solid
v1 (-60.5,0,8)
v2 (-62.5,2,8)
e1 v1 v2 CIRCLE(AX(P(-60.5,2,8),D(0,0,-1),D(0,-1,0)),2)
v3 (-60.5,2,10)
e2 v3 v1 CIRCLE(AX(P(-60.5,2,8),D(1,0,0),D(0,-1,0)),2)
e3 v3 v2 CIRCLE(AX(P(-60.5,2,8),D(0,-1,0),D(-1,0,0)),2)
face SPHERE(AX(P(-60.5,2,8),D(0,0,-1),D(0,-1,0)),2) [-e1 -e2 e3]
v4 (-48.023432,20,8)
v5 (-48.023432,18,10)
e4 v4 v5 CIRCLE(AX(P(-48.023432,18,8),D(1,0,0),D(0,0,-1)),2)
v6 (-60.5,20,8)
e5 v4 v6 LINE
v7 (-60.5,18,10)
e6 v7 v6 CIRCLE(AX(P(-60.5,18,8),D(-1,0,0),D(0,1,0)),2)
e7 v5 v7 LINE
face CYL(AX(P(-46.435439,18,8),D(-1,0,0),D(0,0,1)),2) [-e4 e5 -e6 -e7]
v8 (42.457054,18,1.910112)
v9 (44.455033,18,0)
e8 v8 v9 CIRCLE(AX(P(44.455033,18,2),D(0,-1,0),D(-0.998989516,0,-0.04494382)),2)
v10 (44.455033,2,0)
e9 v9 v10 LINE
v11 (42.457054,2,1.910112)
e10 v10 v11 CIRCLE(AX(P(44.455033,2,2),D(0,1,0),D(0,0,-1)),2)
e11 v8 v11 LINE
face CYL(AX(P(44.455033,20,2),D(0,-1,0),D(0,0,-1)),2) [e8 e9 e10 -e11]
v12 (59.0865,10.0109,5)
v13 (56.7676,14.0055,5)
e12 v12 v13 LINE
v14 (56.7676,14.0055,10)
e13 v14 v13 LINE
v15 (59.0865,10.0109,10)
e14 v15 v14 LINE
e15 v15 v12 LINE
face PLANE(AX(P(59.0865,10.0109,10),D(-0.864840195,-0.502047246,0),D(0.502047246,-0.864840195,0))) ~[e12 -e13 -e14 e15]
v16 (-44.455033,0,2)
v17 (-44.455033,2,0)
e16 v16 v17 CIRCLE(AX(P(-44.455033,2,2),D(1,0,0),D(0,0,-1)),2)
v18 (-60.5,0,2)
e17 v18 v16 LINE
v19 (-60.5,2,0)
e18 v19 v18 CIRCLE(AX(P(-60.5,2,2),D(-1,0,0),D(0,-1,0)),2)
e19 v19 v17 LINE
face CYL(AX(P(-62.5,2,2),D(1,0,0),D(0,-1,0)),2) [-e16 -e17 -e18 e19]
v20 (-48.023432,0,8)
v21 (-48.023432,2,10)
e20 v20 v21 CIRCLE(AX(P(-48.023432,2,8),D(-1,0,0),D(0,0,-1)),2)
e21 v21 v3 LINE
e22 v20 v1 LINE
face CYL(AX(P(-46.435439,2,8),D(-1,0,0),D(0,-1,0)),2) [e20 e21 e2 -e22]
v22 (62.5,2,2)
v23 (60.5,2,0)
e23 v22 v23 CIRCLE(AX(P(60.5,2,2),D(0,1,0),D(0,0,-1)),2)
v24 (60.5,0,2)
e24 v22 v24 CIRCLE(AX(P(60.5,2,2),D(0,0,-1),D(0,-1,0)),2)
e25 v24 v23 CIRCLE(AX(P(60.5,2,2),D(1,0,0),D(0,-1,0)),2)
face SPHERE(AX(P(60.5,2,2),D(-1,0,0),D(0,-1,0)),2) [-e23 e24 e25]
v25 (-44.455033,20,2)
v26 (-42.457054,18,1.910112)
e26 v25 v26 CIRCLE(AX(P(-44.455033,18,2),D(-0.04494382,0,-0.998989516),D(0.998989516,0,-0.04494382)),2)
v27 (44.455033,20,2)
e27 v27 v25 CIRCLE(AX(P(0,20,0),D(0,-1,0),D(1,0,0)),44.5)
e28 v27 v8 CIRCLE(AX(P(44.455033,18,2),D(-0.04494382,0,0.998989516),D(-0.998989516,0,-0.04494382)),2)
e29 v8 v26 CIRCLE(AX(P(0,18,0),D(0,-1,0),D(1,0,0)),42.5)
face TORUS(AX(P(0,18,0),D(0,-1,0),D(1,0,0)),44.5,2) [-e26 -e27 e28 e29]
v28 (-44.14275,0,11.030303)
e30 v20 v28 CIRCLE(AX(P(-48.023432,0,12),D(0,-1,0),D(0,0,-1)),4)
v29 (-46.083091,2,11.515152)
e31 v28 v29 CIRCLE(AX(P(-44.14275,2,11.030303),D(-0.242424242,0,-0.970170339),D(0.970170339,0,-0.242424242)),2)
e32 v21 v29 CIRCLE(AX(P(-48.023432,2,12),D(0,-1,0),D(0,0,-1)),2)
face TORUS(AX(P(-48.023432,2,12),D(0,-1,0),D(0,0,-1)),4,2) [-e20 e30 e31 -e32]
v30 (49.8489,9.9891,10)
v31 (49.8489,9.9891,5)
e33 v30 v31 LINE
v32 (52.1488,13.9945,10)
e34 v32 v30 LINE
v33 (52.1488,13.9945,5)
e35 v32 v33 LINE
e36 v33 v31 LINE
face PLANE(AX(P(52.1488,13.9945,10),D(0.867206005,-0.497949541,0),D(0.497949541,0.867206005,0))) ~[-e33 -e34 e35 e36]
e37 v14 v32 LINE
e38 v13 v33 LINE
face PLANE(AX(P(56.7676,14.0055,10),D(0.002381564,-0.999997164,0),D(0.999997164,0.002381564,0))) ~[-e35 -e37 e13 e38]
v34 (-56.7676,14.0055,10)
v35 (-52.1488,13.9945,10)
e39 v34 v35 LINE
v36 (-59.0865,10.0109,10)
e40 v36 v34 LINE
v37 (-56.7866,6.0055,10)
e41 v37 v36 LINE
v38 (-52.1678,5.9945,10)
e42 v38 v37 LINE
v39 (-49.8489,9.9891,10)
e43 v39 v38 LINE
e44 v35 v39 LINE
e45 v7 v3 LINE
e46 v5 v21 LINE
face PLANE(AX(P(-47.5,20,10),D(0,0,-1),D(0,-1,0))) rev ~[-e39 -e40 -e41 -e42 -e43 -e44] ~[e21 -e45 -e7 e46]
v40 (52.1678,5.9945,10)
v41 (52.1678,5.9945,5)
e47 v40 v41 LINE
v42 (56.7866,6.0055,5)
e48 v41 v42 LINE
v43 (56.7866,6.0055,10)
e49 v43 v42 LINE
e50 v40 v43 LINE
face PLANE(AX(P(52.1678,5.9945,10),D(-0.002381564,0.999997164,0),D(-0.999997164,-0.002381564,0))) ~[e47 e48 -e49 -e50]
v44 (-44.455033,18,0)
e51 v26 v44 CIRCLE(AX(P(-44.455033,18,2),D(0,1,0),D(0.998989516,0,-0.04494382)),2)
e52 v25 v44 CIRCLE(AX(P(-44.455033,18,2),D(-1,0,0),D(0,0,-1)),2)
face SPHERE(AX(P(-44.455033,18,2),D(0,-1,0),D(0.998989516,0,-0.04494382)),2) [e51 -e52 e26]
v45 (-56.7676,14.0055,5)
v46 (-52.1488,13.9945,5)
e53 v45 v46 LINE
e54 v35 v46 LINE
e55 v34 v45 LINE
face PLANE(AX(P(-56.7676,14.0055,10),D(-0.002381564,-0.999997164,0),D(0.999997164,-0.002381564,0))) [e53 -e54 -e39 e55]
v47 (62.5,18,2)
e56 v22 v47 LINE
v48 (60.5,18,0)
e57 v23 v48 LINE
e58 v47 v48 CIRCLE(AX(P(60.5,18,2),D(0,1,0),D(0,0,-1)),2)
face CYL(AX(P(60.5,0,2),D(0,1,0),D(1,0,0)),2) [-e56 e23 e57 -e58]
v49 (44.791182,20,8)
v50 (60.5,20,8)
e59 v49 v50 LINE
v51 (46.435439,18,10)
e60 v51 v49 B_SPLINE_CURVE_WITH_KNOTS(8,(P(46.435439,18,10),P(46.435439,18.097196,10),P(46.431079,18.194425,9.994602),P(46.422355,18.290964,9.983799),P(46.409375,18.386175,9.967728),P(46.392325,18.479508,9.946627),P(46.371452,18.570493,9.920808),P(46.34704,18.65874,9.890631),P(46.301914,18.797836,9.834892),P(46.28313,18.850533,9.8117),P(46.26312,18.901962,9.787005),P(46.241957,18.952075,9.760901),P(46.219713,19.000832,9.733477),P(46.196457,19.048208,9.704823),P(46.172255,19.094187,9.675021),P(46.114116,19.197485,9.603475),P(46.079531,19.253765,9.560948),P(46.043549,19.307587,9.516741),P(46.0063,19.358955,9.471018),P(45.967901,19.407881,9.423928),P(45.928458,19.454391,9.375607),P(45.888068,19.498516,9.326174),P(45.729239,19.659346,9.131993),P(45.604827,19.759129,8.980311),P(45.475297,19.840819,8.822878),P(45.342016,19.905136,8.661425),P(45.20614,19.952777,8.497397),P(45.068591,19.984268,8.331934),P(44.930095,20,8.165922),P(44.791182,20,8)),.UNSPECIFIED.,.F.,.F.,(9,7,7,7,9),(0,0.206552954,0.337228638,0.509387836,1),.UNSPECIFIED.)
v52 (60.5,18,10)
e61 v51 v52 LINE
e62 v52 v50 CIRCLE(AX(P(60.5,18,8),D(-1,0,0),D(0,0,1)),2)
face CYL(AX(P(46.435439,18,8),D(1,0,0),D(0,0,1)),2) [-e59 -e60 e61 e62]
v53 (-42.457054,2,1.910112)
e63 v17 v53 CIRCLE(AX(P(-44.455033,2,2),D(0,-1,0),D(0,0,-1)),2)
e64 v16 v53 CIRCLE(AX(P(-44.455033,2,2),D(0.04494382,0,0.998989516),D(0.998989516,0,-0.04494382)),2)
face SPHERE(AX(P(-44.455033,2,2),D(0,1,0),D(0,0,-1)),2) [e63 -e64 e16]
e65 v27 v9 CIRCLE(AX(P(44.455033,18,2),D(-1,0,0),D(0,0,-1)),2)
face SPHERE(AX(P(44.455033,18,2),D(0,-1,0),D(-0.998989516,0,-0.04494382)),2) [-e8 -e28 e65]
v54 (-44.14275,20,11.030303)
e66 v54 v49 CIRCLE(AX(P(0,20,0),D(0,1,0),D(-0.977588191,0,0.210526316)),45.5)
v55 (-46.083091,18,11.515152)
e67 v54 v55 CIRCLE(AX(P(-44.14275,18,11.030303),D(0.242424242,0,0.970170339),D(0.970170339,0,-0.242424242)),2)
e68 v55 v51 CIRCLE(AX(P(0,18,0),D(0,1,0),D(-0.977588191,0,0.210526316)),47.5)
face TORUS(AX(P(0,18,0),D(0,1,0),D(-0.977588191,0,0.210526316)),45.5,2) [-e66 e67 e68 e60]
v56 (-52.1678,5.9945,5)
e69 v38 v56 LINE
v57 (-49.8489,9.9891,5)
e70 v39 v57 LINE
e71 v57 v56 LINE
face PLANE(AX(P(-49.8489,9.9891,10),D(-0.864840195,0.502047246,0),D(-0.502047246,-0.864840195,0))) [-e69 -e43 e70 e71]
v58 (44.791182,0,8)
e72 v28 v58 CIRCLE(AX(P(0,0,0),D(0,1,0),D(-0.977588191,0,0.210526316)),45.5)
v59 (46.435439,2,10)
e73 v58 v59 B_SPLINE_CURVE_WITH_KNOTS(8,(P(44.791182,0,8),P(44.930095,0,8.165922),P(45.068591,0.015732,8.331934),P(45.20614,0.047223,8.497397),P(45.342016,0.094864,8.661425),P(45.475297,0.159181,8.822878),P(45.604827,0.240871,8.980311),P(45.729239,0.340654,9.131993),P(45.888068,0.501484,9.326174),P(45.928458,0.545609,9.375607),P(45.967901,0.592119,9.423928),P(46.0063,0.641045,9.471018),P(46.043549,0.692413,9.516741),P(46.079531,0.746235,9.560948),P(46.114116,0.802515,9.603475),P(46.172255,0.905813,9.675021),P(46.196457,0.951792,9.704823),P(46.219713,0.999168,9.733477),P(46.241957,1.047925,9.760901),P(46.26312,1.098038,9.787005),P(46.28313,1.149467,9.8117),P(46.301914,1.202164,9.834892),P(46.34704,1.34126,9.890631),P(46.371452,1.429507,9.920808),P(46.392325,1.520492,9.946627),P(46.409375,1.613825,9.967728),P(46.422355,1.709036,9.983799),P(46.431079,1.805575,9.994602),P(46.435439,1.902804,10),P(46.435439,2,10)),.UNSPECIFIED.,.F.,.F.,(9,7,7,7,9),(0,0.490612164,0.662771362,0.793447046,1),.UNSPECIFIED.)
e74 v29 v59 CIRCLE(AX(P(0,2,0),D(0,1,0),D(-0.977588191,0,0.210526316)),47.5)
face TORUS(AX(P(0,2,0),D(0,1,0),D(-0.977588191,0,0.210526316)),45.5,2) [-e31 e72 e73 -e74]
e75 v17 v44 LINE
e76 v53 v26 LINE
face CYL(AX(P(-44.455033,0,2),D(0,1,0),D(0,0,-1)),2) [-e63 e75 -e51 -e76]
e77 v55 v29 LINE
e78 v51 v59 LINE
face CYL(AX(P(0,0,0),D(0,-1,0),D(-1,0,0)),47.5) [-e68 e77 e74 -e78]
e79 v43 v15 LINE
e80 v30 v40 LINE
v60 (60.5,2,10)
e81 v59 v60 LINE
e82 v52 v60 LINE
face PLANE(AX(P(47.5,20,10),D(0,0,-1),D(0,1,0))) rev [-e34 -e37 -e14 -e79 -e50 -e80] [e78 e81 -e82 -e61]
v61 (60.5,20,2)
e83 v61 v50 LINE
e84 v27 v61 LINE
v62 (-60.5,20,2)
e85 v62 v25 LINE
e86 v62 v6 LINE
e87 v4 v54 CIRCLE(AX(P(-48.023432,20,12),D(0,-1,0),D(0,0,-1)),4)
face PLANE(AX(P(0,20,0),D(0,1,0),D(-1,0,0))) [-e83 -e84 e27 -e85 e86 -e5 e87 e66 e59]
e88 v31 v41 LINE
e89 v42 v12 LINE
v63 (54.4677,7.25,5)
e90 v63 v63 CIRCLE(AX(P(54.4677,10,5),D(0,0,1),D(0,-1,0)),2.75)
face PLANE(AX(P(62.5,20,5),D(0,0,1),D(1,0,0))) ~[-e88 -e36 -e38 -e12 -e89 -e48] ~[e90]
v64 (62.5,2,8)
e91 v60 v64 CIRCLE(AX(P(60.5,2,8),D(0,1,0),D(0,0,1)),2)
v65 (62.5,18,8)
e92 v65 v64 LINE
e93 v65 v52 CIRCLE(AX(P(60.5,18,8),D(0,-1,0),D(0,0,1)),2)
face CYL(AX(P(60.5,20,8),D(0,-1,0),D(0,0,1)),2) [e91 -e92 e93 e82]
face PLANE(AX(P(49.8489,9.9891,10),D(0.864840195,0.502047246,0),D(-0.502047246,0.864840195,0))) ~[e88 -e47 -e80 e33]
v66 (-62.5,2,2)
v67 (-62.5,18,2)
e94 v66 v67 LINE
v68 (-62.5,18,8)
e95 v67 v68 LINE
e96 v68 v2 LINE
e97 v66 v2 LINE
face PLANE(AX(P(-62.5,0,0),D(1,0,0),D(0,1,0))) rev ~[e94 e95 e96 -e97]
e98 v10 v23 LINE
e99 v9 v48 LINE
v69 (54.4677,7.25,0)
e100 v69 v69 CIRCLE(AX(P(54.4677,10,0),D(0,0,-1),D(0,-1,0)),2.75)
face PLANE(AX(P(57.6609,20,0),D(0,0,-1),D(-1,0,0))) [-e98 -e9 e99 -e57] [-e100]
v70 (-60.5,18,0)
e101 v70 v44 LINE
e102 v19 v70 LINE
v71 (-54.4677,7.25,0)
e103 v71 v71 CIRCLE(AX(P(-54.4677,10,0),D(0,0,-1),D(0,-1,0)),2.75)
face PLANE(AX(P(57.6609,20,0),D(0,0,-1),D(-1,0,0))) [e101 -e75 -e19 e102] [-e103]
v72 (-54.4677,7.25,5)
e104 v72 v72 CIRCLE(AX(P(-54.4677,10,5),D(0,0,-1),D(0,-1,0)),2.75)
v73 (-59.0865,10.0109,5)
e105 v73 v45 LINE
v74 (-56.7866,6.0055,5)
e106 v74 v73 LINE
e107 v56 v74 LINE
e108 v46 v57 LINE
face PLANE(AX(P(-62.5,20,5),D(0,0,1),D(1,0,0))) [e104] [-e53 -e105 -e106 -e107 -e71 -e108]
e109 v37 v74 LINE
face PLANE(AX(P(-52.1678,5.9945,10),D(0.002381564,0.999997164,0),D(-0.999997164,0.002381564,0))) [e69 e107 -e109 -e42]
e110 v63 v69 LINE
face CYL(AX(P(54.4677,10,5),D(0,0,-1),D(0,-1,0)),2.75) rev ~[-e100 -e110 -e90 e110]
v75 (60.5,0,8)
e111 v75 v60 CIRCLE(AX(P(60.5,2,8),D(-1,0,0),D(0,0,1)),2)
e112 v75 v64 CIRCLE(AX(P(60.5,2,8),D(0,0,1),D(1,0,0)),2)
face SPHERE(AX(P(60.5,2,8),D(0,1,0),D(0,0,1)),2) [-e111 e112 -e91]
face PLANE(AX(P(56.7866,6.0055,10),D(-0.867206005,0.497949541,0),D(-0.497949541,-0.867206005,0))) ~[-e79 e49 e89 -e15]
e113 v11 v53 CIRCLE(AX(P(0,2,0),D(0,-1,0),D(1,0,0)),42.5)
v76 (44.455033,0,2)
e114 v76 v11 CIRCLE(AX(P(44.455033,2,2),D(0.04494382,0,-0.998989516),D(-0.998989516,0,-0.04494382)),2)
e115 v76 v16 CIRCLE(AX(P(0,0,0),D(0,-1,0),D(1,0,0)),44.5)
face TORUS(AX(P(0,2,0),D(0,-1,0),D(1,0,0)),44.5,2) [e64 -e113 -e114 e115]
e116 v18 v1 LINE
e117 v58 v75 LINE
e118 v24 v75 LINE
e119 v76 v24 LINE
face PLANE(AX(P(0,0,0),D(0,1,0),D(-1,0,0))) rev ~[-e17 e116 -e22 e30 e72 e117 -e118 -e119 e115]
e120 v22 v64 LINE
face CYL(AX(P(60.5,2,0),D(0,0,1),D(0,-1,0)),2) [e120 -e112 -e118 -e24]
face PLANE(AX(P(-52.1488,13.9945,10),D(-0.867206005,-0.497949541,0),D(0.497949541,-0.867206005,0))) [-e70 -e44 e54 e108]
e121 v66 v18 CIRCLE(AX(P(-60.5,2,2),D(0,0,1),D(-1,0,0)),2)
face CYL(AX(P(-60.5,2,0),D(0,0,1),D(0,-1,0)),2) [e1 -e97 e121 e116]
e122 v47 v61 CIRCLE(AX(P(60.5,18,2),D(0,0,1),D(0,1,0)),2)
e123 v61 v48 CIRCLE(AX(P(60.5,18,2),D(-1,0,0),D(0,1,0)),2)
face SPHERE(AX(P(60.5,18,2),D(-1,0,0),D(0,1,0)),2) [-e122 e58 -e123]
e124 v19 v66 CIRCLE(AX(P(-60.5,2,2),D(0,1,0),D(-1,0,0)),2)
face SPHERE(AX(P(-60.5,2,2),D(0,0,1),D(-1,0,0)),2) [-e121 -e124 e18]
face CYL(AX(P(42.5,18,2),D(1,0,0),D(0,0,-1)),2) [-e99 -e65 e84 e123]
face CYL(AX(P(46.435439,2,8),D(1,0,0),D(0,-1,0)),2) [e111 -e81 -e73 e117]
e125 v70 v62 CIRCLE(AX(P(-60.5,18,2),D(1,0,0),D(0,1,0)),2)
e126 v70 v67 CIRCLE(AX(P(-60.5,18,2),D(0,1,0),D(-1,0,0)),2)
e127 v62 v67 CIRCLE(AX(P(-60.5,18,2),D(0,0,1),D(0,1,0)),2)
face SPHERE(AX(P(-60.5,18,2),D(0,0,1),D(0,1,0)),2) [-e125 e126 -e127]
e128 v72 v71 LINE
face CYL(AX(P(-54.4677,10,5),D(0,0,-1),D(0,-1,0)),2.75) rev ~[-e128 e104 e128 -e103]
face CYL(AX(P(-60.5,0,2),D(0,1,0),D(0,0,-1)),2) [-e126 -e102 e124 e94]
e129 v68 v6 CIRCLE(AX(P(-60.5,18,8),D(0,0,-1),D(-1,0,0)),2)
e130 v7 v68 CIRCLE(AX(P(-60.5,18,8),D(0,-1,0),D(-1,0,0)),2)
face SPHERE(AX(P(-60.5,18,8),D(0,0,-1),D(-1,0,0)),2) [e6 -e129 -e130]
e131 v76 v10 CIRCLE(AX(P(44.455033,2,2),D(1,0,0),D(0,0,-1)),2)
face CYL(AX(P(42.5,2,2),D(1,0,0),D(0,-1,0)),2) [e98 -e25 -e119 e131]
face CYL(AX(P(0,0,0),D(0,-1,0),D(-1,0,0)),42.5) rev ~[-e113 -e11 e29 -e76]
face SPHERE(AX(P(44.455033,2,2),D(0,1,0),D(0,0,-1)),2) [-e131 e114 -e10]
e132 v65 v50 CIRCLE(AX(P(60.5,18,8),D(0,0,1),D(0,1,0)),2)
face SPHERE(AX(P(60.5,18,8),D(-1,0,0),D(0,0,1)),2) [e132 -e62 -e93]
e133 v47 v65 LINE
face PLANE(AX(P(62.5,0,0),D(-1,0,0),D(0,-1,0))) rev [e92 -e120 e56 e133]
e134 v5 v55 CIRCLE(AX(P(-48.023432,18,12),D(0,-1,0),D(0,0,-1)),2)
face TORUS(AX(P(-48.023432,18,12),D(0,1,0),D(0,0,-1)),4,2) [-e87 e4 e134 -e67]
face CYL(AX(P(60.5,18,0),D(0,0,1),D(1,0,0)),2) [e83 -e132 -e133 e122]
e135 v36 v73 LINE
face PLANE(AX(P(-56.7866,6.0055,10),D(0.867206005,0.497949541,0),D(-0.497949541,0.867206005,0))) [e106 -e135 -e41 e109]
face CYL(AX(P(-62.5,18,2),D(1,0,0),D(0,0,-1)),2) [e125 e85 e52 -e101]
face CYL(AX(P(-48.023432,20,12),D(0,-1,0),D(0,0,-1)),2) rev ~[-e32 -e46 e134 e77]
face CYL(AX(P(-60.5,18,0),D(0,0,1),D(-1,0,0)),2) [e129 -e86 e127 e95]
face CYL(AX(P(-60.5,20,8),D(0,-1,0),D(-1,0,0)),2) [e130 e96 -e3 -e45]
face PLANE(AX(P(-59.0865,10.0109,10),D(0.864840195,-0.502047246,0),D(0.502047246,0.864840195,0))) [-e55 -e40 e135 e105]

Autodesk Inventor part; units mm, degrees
ref_plane "XZ Plane" through (0, 0, 0) normal (0, 1, 0) x (-1, 0, 0)
ref_plane "XY Plane" through (0, 0, 0) normal (0, 0, 1) x (1, 0, 0)
sketch "Sketch1" plane through (0, 0, 0) normal (0, 1, 0) x (-1, 0, 0)
  circle A0 centre (0, 0) radius 47.5
  dimension "d0" = 95
extrude "Extrusion1" add sketch "Sketch1" along normal blind 20
shell "Shell1" thickness 5 removed faces 2 at (-10.3648, 20, 5.7529) at (-10.3648, 0, 5.7529)
sketch "Sketch2" plane through (0, 20, 0) normal (0, 1, 0) x (1, 0, 0)
  line L0 (-62.0625, 51.3519) -> (57.6609, 51.3519)
  line L1 (57.6609, 51.3519) -> (57.6609, 0)
  line L2 (57.6609, 0) -> (-62.0625, 0)
  line L3 (-62.0625, 0) -> (-62.0625, 51.3519)
  point P0 (0, 0)
extrude "Extrusion2" cut sketch "Sketch2" against normal through all
ref_plane "Work Plane1" through (-47.5, 0, 0) normal (1, 0, 0) x (0, 1, 0)
sketch "Sketch3" plane through (-47.5, 0, 0) normal (1, 0, 0) x (0, 1, 0)
  line L0 (0, 0) -> (0, 47.5) projected
  line L1 (0, 0) -> (20, 0)
  line L2 (20, 0) -> (20, 10)
  line L3 (20, 10) -> (0, 10)
  line L4 (0, 10) -> (0, 0)
  point P0 (0, 10)
  dimension "d7" = 20
  dimension "d8" = 10
extrude "Extrusion3" add sketch "Sketch3" along normal blind 2 and the other way blind 15
mirror "Mirror1" about plane through (0, 0, 0) normal (1, 0, 0) of "Extrusion3"
sketch "Sketch6" plane through (-62.5, 20, 10) normal (0, 0, 1) x (1, 0, 0)
  line L0 (10.3322, -14.0055) -> (5.7134, -13.9945)
  line L1 (5.7134, -13.9945) -> (3.4135, -9.9891)
  line L2 (3.4135, -9.9891) -> (5.7324, -5.9945)
  line L3 (5.7324, -5.9945) -> (10.3512, -6.0055)
  line L4 (10.3512, -6.0055) -> (12.6511, -10.0109)
  line L5 (12.6511, -10.0109) -> (10.3322, -14.0055)
  line L6 (0, -20) -> (0, 0) projected
  line L7 (16.0646, 0) -> (0, 0) projected
  point P0 (62.5, -20)
  point P1 (8.0323, -10)
  point P2 (0, -10)
  point P3 (8.0323, 0)
  dimension "d27" = 8
extrude "Extrusion4" cut sketch "Sketch6" against normal blind 5
sketch "Sketch7" plane through (-62.5, 20, 5) normal (0, 0, 1) x (1, 0, 0)
  line L0 (0, -20) -> (0, 0) projected
  line L1 (16.0646, 0) -> (0, 0) projected
  point P0 (62.5, -20)
  point P1 (8.0323, -10)
  point P2 (0, -10)
  point P3 (8.0323, 0)
hole "Hole3" at (-54.4677, 10, 5) direction (0, 0, -1) diameter 5.5 end through all clearance for "Hex Head Bolt" size "M5" standard "Ansi Metric M Profile"
mirror "Mirror3" about plane through (0, 0, 0) normal (1, 0, 0) of "Extrusion4", "Hole3"
fillet "Fillet1" radius 2 23 edges at (-62.5, 0, 5) (-62.5, 20, 5) (-46.4354, 10, 10) (-54.4677, 0, 10) (-62.5, 10, 10) (-54.4677, 20, 10) (0, 20, 47.5) (0, 20, 42.5) (0, 0, 47.5) (-52.5, 20, 0) (52.5, 20, 0) (-62.5, 10, 0) (-52.5, 0, 0) (52.5, 0, 0) (0, 0, 42.5) (54.4677, 20, 10) (62.5, 10, 10) (54.4677, 0, 10) (62.5, 0, 5) (62.5, 20, 5) (62.5, 10, 0) (-42.5, 10, 0) (42.5, 10, 0)
properties part number "ur5e_cable_tube_bottom_85mm"
